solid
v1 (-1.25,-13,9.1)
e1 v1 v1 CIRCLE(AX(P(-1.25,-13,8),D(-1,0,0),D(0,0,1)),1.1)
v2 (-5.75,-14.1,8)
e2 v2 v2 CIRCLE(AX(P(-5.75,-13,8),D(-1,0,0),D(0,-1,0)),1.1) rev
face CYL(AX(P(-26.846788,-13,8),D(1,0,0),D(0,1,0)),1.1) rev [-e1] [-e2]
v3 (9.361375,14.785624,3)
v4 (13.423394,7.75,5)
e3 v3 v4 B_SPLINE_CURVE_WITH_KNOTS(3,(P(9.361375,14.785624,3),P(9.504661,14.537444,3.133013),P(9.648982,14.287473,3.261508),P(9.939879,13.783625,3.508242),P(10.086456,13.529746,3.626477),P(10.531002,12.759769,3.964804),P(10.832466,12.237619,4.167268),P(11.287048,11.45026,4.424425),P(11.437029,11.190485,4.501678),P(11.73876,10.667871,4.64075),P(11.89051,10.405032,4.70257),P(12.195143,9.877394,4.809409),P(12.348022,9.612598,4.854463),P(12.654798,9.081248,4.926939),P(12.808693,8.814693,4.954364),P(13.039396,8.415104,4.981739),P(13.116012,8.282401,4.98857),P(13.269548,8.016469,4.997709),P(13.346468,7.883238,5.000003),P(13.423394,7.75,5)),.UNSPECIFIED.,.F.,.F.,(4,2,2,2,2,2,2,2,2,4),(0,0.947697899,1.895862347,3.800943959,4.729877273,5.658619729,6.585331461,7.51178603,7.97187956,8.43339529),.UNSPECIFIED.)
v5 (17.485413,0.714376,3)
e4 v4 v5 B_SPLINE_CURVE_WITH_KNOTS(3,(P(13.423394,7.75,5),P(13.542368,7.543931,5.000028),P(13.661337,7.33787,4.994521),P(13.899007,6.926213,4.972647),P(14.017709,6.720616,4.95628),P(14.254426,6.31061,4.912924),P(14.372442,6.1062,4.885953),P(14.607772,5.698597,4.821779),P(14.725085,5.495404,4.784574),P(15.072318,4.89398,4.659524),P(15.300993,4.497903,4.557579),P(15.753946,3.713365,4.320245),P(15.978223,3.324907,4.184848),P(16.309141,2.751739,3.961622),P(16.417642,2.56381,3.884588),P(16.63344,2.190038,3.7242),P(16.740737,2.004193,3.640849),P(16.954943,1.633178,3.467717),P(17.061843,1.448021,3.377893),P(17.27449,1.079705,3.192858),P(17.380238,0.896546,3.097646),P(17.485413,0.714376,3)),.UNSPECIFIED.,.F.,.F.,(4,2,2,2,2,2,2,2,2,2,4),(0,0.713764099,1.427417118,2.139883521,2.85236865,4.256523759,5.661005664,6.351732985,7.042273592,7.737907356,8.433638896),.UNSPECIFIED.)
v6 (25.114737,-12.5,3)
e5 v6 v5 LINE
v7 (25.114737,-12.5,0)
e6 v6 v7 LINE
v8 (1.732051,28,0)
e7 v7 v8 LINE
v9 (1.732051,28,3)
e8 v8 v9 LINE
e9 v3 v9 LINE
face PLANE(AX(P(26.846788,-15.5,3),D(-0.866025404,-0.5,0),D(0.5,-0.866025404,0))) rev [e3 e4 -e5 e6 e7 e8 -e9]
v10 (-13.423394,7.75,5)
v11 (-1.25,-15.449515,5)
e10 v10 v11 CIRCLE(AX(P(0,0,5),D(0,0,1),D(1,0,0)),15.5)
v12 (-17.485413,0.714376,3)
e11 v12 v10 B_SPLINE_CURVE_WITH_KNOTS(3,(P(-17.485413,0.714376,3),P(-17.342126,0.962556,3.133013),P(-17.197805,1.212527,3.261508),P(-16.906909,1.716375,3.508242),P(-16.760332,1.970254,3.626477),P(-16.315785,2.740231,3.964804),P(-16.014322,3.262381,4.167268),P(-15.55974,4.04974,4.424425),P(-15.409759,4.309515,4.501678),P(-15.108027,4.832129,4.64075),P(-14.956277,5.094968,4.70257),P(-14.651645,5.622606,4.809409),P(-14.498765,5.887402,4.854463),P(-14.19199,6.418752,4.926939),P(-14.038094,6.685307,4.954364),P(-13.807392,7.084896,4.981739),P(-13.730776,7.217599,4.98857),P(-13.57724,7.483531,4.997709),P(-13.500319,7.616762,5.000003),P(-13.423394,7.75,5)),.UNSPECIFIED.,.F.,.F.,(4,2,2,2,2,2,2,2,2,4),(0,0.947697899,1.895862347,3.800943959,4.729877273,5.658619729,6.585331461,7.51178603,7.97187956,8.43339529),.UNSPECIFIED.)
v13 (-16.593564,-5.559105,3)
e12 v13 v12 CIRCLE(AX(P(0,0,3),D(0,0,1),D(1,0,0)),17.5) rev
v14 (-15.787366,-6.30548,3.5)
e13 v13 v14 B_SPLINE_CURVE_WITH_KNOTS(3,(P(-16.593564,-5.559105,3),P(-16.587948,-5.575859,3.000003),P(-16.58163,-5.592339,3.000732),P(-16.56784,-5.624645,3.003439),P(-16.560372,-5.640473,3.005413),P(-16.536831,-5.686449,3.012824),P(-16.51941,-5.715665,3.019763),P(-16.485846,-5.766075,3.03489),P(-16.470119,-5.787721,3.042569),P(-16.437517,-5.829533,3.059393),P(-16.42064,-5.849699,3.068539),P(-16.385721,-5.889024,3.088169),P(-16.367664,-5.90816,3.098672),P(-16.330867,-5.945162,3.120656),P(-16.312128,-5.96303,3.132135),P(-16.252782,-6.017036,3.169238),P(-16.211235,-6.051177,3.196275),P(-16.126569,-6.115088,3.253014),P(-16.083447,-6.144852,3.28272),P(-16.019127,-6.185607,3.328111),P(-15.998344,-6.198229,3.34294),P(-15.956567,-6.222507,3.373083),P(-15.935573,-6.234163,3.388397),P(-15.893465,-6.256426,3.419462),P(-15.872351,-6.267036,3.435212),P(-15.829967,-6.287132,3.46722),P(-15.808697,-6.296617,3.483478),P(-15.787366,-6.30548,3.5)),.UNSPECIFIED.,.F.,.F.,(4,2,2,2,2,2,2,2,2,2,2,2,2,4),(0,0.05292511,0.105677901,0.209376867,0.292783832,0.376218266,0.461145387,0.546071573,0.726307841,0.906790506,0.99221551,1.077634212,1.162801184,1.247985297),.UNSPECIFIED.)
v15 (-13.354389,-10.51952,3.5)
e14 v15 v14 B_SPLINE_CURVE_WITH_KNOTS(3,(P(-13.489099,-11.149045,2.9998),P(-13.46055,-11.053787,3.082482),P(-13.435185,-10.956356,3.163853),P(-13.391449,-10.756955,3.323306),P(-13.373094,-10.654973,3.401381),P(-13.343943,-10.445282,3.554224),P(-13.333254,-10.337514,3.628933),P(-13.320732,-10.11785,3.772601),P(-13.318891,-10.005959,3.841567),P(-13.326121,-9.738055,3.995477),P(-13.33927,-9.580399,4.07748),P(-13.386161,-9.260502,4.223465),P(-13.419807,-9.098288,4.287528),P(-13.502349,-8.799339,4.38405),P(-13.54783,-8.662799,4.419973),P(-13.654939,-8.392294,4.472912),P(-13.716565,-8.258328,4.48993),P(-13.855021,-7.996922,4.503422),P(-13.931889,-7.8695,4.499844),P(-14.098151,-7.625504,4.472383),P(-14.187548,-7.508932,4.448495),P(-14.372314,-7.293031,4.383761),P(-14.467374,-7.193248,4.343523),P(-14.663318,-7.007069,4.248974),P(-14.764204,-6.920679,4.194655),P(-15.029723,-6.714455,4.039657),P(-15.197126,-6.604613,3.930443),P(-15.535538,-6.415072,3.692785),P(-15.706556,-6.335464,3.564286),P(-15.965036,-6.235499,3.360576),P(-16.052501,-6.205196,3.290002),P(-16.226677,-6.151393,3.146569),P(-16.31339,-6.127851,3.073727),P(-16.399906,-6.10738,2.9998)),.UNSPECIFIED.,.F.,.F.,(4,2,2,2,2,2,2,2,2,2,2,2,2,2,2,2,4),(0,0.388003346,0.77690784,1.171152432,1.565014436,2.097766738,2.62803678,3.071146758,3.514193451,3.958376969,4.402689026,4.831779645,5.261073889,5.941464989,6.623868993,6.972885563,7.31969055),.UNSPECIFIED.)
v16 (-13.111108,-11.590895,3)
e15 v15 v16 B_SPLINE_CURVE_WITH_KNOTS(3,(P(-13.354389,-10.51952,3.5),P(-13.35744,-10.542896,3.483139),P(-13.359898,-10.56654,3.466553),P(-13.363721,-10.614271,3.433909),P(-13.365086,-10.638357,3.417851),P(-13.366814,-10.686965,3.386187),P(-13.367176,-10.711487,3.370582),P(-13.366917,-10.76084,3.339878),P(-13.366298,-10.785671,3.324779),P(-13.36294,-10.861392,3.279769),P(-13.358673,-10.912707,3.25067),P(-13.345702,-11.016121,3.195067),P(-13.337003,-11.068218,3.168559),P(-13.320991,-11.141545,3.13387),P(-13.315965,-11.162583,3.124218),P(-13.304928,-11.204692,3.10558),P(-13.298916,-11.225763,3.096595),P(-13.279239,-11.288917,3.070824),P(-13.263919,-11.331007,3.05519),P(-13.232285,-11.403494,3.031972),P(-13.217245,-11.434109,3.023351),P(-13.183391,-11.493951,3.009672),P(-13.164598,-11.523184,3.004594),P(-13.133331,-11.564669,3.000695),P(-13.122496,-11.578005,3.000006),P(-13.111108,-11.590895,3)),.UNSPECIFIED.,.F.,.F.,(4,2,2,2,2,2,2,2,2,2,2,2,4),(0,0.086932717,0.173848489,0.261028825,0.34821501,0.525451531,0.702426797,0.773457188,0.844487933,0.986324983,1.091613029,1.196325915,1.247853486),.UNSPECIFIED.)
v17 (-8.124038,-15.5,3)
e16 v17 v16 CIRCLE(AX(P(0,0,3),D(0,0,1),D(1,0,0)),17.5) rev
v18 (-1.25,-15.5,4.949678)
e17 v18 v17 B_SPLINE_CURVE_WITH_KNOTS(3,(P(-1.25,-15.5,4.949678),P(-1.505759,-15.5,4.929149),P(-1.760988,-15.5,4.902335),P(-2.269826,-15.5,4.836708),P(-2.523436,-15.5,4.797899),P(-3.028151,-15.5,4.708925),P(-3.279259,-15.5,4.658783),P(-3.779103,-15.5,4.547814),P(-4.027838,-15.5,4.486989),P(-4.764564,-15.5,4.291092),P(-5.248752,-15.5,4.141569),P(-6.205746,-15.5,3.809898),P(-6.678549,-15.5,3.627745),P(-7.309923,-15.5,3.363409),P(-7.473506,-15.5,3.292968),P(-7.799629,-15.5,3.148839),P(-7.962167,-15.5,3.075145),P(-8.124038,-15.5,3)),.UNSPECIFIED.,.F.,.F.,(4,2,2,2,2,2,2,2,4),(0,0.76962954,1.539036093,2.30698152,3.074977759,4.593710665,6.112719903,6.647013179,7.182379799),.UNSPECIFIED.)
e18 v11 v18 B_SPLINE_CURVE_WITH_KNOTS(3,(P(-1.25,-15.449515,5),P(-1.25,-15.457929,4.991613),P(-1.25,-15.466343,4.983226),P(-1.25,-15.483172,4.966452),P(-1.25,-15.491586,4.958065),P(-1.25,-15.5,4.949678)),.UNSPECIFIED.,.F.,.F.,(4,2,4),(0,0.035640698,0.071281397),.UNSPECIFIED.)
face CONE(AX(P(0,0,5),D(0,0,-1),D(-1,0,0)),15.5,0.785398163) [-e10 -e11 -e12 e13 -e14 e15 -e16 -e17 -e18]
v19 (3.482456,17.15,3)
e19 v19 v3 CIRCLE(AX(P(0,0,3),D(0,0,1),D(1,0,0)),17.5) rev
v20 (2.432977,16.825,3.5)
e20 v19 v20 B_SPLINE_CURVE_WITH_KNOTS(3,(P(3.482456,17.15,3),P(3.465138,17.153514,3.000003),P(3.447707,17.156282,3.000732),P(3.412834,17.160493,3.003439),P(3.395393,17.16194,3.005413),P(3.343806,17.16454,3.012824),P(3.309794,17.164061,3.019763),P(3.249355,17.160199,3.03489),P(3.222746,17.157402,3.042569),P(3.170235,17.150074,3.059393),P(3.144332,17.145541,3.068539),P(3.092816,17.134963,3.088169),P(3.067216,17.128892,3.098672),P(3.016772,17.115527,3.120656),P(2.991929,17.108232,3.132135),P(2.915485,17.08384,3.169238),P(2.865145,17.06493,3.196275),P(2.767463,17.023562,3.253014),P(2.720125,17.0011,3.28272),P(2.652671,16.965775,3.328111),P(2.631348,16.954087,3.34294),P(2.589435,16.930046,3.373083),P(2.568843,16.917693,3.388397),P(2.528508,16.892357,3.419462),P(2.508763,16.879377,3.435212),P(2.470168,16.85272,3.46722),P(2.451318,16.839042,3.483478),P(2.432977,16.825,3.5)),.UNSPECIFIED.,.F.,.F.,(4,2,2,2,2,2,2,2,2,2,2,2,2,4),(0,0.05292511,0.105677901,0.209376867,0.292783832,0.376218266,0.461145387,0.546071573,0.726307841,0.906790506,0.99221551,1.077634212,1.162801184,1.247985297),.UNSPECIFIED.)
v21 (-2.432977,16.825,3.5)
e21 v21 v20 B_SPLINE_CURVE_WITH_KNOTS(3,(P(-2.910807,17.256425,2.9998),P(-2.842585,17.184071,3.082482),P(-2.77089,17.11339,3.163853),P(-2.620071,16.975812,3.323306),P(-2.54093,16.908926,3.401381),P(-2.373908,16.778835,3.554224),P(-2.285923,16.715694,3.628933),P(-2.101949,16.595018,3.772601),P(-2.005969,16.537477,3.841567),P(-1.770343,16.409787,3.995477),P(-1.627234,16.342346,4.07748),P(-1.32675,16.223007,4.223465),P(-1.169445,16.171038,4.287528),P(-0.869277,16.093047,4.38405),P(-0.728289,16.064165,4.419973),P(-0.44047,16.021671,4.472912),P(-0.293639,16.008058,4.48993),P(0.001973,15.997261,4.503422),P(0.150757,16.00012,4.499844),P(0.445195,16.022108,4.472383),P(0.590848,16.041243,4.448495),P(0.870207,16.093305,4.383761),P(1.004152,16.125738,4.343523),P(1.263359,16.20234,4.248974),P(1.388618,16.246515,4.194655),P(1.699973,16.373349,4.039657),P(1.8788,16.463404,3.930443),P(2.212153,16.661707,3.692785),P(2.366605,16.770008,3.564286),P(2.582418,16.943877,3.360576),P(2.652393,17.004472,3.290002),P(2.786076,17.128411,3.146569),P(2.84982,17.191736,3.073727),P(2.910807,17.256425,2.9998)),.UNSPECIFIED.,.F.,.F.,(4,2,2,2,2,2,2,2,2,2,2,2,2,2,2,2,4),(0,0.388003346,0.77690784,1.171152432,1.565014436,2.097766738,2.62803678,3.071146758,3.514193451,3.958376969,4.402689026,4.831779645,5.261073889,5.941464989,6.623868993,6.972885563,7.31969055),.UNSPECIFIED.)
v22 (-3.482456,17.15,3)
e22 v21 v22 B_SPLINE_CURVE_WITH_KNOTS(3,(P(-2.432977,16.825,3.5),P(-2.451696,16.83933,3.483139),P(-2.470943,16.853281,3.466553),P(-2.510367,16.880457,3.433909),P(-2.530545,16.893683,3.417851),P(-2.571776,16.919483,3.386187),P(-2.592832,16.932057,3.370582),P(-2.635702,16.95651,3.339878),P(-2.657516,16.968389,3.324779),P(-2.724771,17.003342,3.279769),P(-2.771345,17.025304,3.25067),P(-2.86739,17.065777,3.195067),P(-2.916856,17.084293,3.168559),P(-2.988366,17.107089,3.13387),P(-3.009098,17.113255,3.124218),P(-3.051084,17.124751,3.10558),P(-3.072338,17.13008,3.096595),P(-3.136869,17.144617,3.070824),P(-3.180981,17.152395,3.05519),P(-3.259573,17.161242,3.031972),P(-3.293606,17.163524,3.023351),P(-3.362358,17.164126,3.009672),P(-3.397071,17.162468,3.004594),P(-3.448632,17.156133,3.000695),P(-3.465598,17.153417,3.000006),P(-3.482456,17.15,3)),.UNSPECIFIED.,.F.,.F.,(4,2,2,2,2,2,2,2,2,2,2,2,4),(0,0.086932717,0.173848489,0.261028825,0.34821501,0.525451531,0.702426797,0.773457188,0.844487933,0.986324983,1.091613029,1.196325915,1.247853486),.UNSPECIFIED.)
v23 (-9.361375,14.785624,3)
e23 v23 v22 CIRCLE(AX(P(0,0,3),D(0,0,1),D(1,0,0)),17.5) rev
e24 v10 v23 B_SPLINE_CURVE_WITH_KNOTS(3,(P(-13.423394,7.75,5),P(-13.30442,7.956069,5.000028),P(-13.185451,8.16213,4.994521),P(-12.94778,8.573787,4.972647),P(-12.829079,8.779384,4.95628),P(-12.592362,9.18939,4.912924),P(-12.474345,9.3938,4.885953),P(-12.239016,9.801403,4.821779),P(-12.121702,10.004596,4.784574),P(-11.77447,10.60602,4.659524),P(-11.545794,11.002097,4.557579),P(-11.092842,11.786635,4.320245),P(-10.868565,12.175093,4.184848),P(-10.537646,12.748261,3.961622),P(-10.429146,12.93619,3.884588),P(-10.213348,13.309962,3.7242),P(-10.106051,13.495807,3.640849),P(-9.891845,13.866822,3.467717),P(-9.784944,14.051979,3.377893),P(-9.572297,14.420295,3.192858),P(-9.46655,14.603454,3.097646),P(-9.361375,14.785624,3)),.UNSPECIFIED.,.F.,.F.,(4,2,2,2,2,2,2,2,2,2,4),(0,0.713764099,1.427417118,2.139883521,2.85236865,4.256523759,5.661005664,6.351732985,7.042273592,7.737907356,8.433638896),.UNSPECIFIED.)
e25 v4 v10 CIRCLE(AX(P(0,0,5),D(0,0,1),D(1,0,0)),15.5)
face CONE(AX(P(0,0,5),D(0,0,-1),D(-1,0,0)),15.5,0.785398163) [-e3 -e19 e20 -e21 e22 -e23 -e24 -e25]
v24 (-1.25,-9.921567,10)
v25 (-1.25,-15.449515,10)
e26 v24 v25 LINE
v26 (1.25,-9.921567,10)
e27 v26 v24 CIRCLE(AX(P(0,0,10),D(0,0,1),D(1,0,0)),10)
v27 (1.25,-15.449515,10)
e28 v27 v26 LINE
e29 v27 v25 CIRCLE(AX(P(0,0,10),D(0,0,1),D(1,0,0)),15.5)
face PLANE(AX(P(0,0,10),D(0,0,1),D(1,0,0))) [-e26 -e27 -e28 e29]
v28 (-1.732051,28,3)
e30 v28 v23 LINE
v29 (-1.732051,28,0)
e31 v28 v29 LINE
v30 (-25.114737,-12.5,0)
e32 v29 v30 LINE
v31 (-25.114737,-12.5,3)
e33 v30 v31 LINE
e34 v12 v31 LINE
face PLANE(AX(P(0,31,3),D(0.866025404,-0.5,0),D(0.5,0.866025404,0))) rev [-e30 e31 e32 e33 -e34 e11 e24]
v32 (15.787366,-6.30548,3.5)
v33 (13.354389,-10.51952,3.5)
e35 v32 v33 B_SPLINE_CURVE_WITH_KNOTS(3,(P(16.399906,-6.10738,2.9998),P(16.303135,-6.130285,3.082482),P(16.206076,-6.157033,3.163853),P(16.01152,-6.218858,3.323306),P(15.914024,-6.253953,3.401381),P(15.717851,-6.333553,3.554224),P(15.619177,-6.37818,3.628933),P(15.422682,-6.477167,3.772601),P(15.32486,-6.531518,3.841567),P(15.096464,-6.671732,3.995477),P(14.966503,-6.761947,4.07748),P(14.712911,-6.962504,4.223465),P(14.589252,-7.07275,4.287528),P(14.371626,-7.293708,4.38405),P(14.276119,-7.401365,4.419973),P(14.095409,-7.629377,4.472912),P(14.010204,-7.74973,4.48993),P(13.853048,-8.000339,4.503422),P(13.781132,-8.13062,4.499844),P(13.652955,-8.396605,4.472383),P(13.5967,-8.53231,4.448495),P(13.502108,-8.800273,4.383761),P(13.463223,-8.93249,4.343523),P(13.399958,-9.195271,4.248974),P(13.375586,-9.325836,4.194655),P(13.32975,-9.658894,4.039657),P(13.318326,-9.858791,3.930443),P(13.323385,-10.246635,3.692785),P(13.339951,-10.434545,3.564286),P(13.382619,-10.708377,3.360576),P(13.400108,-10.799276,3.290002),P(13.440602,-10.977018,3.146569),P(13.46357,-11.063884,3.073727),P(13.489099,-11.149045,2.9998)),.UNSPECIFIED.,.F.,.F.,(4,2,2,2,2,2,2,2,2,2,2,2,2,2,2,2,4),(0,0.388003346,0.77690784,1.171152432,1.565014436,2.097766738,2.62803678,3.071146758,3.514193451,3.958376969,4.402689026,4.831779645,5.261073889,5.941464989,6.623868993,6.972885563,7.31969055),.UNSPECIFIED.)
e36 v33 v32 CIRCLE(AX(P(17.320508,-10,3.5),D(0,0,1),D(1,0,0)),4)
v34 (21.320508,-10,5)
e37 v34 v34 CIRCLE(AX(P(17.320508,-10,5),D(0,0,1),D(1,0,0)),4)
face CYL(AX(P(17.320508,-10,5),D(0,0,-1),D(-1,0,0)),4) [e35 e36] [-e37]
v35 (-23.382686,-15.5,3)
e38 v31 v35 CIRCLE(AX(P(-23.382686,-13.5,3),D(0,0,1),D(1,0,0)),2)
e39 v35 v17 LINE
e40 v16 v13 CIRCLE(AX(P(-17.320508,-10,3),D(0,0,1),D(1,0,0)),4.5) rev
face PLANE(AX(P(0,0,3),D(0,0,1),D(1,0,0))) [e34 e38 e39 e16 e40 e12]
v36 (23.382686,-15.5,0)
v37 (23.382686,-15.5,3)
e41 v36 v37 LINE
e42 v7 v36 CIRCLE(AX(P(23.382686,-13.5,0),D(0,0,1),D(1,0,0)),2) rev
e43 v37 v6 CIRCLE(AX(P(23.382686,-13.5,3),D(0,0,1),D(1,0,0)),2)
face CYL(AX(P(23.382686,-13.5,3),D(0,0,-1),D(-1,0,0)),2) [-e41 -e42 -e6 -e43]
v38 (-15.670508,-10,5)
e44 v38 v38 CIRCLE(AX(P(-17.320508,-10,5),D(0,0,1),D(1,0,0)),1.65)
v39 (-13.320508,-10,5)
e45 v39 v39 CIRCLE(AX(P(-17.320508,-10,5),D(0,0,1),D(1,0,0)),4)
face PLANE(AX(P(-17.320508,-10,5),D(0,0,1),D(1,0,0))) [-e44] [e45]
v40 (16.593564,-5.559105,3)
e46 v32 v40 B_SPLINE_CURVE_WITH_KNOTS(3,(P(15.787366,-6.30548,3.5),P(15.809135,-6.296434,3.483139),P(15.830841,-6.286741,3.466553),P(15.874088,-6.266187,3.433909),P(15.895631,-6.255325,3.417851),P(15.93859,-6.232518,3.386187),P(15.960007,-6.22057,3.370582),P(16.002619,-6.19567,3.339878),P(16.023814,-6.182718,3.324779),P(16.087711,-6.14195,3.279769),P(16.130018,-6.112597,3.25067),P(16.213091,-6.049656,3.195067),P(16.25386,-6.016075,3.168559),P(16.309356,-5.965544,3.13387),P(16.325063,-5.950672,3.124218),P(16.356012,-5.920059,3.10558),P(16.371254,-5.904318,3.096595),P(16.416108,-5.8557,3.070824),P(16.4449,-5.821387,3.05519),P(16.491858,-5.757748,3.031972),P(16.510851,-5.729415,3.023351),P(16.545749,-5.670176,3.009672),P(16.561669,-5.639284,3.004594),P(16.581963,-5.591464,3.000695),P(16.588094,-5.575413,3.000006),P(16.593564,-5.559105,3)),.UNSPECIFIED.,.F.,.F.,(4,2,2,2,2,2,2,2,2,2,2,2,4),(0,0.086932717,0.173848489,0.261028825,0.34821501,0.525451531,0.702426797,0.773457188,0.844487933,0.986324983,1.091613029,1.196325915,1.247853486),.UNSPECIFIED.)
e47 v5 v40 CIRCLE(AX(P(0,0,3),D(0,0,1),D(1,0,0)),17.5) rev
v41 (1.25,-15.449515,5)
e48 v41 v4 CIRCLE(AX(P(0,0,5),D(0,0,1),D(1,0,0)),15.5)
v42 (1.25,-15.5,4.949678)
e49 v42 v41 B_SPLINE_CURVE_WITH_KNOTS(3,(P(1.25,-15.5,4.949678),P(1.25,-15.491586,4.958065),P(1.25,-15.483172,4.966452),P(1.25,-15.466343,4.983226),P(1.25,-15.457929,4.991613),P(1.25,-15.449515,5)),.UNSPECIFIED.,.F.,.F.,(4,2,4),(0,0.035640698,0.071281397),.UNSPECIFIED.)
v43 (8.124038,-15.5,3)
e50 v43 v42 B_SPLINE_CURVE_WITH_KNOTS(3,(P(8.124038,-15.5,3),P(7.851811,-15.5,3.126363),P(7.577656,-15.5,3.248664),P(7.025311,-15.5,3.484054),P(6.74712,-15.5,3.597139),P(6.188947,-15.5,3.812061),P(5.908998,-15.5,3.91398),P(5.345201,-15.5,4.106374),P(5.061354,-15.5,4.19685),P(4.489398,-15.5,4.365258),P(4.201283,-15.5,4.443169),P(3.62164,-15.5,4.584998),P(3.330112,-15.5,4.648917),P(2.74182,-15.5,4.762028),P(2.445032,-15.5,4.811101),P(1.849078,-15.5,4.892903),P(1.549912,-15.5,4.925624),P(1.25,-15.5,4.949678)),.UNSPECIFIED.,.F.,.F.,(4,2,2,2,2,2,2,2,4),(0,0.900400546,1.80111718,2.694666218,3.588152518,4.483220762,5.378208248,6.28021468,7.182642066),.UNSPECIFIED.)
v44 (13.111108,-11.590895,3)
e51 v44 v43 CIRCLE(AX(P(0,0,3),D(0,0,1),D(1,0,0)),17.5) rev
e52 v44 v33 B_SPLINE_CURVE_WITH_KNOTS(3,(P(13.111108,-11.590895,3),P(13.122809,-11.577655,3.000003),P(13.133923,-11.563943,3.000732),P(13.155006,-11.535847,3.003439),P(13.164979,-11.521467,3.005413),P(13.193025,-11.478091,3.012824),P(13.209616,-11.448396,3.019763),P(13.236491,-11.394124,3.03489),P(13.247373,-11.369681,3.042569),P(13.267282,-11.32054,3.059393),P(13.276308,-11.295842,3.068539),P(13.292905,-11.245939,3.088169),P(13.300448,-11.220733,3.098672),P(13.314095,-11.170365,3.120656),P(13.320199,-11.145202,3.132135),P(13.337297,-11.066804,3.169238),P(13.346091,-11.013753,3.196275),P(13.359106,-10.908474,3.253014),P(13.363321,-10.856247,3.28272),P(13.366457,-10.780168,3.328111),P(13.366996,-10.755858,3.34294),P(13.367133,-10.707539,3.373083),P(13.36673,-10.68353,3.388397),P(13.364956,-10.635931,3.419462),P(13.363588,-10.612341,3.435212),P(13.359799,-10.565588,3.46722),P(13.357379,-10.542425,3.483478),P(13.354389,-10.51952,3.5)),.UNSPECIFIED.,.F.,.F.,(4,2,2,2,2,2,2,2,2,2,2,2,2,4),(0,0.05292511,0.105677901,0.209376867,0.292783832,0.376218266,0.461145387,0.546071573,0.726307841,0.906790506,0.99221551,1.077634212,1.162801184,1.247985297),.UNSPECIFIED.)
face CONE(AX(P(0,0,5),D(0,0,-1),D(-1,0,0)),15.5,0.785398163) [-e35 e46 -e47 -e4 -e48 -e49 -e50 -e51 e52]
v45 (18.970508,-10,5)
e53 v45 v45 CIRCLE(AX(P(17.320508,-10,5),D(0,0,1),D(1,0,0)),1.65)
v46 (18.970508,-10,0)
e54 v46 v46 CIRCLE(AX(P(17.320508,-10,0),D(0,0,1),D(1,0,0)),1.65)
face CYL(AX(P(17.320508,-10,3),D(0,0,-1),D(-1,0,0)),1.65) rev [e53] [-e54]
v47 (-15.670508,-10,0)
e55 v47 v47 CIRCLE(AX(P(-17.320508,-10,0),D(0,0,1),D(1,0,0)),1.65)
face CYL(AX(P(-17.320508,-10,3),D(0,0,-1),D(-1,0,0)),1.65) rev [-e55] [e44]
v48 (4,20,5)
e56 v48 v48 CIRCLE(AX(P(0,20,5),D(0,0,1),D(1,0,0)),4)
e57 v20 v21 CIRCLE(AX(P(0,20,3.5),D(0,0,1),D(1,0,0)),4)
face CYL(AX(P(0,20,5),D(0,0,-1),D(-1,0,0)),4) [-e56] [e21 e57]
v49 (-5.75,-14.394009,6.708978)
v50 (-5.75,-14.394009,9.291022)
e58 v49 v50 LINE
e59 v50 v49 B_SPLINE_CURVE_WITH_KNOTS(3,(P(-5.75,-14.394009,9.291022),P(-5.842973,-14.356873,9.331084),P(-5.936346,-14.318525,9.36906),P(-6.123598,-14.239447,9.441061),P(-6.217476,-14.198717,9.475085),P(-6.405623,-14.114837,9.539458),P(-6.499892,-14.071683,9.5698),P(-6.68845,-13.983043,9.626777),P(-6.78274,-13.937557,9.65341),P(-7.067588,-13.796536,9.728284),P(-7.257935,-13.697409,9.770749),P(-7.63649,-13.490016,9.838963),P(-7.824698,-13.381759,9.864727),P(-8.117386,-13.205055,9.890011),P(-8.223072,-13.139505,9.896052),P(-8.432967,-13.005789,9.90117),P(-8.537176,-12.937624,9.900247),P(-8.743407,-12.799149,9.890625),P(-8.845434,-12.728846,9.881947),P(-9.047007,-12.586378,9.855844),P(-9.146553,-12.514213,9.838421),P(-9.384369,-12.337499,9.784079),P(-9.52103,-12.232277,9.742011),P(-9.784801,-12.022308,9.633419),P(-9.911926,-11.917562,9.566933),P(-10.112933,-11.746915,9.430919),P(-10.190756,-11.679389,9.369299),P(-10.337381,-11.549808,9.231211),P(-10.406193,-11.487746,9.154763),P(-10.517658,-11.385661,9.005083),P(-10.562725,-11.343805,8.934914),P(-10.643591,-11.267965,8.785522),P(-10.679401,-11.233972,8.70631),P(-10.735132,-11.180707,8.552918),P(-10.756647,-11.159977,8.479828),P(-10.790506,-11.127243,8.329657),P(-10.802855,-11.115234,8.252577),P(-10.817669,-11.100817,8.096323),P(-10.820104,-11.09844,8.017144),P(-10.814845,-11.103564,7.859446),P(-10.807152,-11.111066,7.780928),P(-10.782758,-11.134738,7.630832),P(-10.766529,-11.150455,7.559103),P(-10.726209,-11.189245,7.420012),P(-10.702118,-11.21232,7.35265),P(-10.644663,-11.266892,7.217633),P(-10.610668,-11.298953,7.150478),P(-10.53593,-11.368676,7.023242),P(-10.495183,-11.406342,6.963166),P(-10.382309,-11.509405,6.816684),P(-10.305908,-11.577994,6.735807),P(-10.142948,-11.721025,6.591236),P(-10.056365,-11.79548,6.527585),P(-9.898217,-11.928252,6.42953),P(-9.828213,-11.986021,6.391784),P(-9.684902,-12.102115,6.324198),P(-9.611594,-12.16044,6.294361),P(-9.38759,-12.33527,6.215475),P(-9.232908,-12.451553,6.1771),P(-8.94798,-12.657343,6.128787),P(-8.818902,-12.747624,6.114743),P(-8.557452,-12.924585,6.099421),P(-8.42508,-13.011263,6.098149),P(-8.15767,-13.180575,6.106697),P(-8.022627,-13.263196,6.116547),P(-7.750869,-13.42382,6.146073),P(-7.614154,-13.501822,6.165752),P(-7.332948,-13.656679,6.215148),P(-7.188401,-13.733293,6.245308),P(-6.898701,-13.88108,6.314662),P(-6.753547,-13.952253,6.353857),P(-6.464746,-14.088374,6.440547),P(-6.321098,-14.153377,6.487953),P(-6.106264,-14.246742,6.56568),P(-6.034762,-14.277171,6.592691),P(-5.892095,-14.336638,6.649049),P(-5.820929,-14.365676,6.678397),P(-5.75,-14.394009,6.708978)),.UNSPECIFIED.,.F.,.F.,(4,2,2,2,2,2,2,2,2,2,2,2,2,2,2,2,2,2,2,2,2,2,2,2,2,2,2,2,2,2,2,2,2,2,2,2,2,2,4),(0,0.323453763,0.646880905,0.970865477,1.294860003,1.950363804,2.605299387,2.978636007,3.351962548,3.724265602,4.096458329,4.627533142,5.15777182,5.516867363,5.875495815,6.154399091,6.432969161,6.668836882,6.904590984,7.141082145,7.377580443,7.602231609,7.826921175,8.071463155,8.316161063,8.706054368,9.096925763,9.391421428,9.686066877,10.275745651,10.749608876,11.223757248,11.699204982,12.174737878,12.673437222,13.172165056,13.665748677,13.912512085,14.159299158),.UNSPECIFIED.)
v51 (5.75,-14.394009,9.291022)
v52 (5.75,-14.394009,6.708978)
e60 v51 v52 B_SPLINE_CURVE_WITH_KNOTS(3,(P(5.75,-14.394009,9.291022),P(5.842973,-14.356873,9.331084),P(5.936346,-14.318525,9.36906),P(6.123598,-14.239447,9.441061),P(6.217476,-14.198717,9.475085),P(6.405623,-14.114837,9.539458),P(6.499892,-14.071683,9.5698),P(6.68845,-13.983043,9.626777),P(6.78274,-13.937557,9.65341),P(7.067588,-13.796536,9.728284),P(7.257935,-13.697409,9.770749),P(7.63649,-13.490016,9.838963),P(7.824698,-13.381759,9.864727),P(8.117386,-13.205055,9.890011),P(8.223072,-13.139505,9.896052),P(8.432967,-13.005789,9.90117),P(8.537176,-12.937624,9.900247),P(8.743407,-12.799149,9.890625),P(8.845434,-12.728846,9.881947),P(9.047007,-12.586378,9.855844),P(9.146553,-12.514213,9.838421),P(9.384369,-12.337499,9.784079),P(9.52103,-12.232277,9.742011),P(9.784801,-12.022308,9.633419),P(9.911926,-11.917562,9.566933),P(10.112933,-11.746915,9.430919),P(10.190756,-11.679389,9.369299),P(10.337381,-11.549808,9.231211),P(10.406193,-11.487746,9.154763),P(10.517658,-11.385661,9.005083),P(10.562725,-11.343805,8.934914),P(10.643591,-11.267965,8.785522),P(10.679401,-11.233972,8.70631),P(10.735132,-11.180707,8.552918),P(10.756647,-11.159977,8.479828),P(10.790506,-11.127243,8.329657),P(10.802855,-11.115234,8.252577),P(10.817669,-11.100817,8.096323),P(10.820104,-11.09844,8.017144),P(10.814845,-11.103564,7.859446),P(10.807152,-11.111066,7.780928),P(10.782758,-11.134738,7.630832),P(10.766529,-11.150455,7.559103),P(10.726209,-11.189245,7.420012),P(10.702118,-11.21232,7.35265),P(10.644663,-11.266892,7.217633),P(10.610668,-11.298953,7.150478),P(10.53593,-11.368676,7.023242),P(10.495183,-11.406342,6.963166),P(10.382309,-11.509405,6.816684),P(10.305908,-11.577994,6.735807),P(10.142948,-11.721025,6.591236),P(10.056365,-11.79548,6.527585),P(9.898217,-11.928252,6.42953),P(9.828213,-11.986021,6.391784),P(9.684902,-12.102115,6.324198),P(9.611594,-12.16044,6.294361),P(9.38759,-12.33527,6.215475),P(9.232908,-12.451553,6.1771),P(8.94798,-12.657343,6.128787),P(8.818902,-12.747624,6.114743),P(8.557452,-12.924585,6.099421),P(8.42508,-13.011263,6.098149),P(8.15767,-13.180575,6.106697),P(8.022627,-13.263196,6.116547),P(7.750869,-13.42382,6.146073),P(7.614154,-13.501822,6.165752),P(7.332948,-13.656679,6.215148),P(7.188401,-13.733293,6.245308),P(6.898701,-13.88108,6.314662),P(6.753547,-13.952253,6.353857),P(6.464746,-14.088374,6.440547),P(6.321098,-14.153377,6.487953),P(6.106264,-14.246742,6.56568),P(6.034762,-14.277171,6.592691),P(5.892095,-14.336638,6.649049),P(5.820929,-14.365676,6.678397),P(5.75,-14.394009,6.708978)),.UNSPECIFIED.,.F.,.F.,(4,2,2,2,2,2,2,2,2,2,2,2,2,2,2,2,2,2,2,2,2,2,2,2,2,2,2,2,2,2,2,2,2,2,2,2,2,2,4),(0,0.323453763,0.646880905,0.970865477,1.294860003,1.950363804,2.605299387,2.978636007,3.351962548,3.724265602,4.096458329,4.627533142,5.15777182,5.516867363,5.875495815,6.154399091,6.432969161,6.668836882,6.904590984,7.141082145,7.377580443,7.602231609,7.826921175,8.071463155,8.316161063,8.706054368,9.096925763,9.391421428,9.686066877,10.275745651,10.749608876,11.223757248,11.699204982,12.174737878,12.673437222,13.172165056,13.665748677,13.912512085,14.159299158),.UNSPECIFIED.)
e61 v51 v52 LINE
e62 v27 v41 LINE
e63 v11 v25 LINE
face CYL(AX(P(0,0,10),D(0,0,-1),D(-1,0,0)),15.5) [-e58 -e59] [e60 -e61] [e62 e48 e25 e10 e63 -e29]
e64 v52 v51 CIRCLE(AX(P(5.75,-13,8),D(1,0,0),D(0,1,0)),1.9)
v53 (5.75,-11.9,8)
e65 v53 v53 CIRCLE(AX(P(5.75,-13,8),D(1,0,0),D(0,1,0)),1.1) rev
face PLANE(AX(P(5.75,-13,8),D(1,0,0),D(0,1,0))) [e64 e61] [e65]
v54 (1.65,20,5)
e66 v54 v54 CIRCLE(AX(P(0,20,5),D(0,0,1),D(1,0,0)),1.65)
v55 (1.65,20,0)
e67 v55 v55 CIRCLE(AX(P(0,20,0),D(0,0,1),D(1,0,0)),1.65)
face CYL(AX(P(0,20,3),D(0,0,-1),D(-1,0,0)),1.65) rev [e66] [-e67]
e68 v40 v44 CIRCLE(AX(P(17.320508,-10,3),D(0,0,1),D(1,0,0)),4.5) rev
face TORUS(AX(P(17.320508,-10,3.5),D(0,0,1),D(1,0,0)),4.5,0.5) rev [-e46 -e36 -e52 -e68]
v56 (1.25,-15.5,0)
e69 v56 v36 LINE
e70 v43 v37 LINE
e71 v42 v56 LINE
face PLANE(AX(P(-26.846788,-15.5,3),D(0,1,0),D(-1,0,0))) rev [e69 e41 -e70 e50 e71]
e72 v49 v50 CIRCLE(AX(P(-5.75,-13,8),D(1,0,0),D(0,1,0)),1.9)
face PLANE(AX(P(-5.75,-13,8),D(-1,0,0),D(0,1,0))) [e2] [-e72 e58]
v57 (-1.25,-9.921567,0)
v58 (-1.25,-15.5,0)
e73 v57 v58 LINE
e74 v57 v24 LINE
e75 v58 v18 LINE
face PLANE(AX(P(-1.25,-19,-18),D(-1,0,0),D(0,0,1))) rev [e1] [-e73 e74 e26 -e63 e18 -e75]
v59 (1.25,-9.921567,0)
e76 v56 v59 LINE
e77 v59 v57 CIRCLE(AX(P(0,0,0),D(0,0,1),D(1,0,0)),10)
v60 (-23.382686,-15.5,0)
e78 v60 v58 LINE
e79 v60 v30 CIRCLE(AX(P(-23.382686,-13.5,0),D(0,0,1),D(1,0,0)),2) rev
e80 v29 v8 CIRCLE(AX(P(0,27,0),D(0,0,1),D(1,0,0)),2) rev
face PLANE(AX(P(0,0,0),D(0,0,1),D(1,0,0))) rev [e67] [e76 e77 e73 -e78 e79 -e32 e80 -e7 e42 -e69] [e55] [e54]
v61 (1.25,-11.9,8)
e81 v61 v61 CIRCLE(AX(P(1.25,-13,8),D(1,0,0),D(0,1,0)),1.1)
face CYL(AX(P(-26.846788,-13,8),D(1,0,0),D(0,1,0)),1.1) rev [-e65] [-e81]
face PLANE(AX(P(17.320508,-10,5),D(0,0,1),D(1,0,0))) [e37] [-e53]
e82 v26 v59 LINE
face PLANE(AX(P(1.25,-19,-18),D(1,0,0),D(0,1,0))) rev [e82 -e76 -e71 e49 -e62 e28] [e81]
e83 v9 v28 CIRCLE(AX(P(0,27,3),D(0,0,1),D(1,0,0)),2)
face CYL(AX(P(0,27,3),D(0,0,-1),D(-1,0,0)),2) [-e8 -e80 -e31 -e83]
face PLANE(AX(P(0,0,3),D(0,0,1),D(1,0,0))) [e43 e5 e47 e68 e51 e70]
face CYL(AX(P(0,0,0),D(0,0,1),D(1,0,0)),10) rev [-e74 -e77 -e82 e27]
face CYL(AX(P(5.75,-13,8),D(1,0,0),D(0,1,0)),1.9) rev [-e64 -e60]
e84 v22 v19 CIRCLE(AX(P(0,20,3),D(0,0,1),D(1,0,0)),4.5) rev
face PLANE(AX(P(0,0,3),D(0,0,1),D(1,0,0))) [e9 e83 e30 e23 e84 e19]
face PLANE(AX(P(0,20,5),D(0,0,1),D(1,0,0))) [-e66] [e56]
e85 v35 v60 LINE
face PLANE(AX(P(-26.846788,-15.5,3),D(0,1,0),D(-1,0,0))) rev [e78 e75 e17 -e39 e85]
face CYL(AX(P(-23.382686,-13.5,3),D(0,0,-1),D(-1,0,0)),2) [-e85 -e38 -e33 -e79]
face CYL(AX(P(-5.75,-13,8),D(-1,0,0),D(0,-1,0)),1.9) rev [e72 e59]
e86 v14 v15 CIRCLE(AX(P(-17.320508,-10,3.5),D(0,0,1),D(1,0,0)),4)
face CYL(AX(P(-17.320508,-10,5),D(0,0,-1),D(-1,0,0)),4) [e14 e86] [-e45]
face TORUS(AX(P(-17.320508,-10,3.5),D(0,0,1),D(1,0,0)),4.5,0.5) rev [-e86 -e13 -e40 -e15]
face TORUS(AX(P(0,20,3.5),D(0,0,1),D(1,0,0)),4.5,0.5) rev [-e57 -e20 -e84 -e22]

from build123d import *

# Parameters (mm, degrees)
SKETCH_1_R               = 1.65
SKETCH_1_R_2             = 9
EXTRUDE_1_DEPTH          = 3
SKETCH_2_R               = 15.5
SKETCH_2_R_2             = 9
EXTRUDE_2_DEPTH          = 7
SKETCH_3_W               = 2.5
SKETCH_3_H               = 20
CUT_EXTRUDE_1_DEPTH      = 28
CUT_EXTRUDE_2_DEPTH      = 44.016618519
CUT_EXTRUDE_2_DEPTH_BACK = 44.016618519
SKETCH_4_R               = 1.1
SKETCH_5_R               = 10
CUT_EXTRUDE_3_DEPTH      = 43.210780613
SKETCH_6_R               = 1.9
CUT_EXTRUDE_8_DEPTH      = 13
CHAMFER_1_SIZE           = 2
FILLET_2_R               = 2
SKETCH_7_R               = 4
SKETCH_7_R_2             = 1.65
EXTRUDE_3_DEPTH          = 2
FILLET_3_R               = 0.5


with BuildPart() as part:
    # 草图1 → 凸台-拉伸1 (new body)
    with BuildSketch(Plane.XY):
        Polygon((0, 31), (-26.846787517, -15.5), (26.846787517, -15.5), align=None)
        with Locations((0, 20)):
            Circle(SKETCH_1_R, mode=Mode.SUBTRACT)
        with Locations((17.320508076, -10)):
            Circle(SKETCH_1_R, mode=Mode.SUBTRACT)
        with Locations((-17.320508076, -10)):
            Circle(SKETCH_1_R, mode=Mode.SUBTRACT)
        Circle(SKETCH_1_R_2, mode=Mode.SUBTRACT)
    extrude(amount=EXTRUDE_1_DEPTH)

    # 草图2 → 凸台-拉伸2 (add)
    with BuildSketch(Plane.XY.offset(3)):
        with Locations(Location((0, 0, 0), (0, 0, 150))):
            Circle(SKETCH_2_R)
        Circle(SKETCH_2_R_2, mode=Mode.SUBTRACT)
    extrude(amount=EXTRUDE_2_DEPTH)

    # 草图3 → 切除-拉伸1 (cut)
    with BuildSketch(Plane.XY.offset(10)):
        with Locations((0, -9)):
            Rectangle(SKETCH_3_W, SKETCH_3_H)
    extrude(amount=-CUT_EXTRUDE_1_DEPTH, mode=Mode.SUBTRACT)

    # 草图4 → 切除-拉伸2 (cut, two sides: drawn at the far end of the back side and taken through both)
    with BuildSketch(Plane(origin=(-1.25, 0, 0), x_dir=(0, 0, -1), z_dir=(1, 0, 0)).offset(-CUT_EXTRUDE_2_DEPTH_BACK)):
        with Locations(Location((-8, -13, 0), (0, 0, 90))):
            Circle(SKETCH_4_R)
    extrude(amount=CUT_EXTRUDE_2_DEPTH + CUT_EXTRUDE_2_DEPTH_BACK, mode=Mode.SUBTRACT)

    # 草图5 → 切除-拉伸3 (cut, through all)
    with BuildSketch(Plane.XY.offset(10)):
        Circle(SKETCH_5_R)
    extrude(amount=-CUT_EXTRUDE_3_DEPTH, mode=Mode.SUBTRACT)

    # 草图6 → 切除-拉伸8 (cut)
    with BuildSketch(Plane(origin=(18.75, 0, 0), x_dir=(0, 0, -1), z_dir=(1, 0, 0))):
        with Locations((-8, -13)):
            Circle(SKETCH_6_R)
    cut_extrude_8 = extrude(amount=-CUT_EXTRUDE_8_DEPTH, mode=Mode.SUBTRACT)

    # 镜向1: 切除-拉伸8 across plane
    add(cut_extrude_8.mirror(Plane(origin=(0, 0, 0), x_dir=(0, 0, 1), z_dir=(1, 0, 0))), mode=Mode.SUBTRACT)

    # 倒角1
    # the kernel refuses this chamfer: 2 mm, written as the material it adds along each edge
    with BuildSketch(Plane(origin=(0, 0, 3), x_dir=(-0.24867915141291427, -0.9685859175378057, 0), z_dir=(-0.9685859175378057, 0.24867915141291427, 0))) as chamfer_1_piece_1_section:
        Polygon((15.5 + CHAMFER_1_SIZE, 0), (15.5, CHAMFER_1_SIZE), (15.5, 0), align=None)
    chamfer_1_piece_1 = revolve(axis=Axis((0, 0, 3), (0, 0, 1)), revolution_arc=134.399365049, mode=Mode.PRIVATE)
    chamfer_1_piece_1 = split(chamfer_1_piece_1, bisect_by=Plane(origin=(-1.25, -15.346279834, 3.925823909), z_dir=(-1, 0, 0)), keep=Keep.TOP, mode=Mode.PRIVATE)
    chamfer_1_piece_1 = split(chamfer_1_piece_1, bisect_by=Plane(origin=(-2.983750464, -15.5, 3.925823909), z_dir=(0, 1, 0)), keep=Keep.TOP, mode=Mode.PRIVATE)
    add(chamfer_1_piece_1)
    with BuildSketch(Plane(origin=(0, 0, 3), x_dir=(-0.24867915141291427, -0.9685859175378057, 0), z_dir=(-0.9685859175378057, 0.24867915141291427, 0))) as chamfer_1_piece_2_section:
        Polygon((15.5 + CHAMFER_1_SIZE, 0), (15.5, CHAMFER_1_SIZE), (15.5, 0), align=None)
    chamfer_1_piece_2 = revolve(axis=Axis((0, 0, 3), (0, 0, 1)), revolution_arc=134.399365049, mode=Mode.PRIVATE)
    chamfer_1_piece_2 = split(chamfer_1_piece_2, bisect_by=Plane(origin=(1.25, -7.656401186, 3.97388988), z_dir=(1, 0, 0)), keep=Keep.TOP, mode=Mode.PRIVATE)
    chamfer_1_piece_2 = split(chamfer_1_piece_2, bisect_by=Plane(origin=(14.586588654, -15.5, 3.97388988), z_dir=(0, 1, 0)), keep=Keep.TOP, mode=Mode.PRIVATE)
    chamfer_1_piece_2 = split(chamfer_1_piece_2, bisect_by=Plane(origin=(20.385359887, -4.308479054, 3.97388988), z_dir=(-0.8660254037844387, -0.5000000000000001, 0)), keep=Keep.TOP, mode=Mode.PRIVATE)
    add(chamfer_1_piece_2)
    with BuildSketch(Plane(origin=(0, 0, 3), x_dir=(-0.8660254037844386, 0.4999999999999999, 0), z_dir=(0.4999999999999999, 0.8660254037844386, 0))) as chamfer_1_piece_3_section:
        Polygon((15.5 + CHAMFER_1_SIZE, 0), (15.5, CHAMFER_1_SIZE), (15.5, 0), align=None)
    chamfer_1_piece_3 = revolve(axis=Axis((0, 0, 3), (0, 0, 1)), revolution_arc=134.399364936, mode=Mode.PRIVATE)
    chamfer_1_piece_3 = split(chamfer_1_piece_3, bisect_by=Plane(origin=(-20.385359891, -4.308479063, 3.973889878), z_dir=(0.8660254037844387, -0.5000000000000001, 0)), keep=Keep.TOP, mode=Mode.PRIVATE)
    chamfer_1_piece_3 = split(chamfer_1_piece_3, bisect_by=Plane(origin=(-1.25, -7.656401201, 3.973889878), z_dir=(-1, 0, 0)), keep=Keep.TOP, mode=Mode.PRIVATE)
    chamfer_1_piece_3 = split(chamfer_1_piece_3, bisect_by=Plane(origin=(-14.586588647, -15.5, 3.973889878), z_dir=(0, 1, 0)), keep=Keep.TOP, mode=Mode.PRIVATE)
    add(chamfer_1_piece_3)
    with BuildSketch(Plane(origin=(0, 0, 3), x_dir=(-0.8660254037844386, 0.4999999999999999, 0), z_dir=(0.4999999999999999, 0.8660254037844386, 0))) as chamfer_1_piece_4_section:
        Polygon((15.5 + CHAMFER_1_SIZE, 0), (15.5, CHAMFER_1_SIZE), (15.5, 0), align=None)
    chamfer_1_piece_4 = revolve(axis=Axis((0, 0, 3), (0, 0, 1)), revolution_arc=134.399364936, mode=Mode.PRIVATE)
    chamfer_1_piece_4 = split(chamfer_1_piece_4, bisect_by=Plane(origin=(1.25, -15.346279834, 3.925823908), z_dir=(1, 0, 0)), keep=Keep.TOP, mode=Mode.PRIVATE)
    chamfer_1_piece_4 = split(chamfer_1_piece_4, bisect_by=Plane(origin=(2.983750464, -15.5, 3.925823908), z_dir=(0, 1, 0)), keep=Keep.TOP, mode=Mode.PRIVATE)
    add(chamfer_1_piece_4)
    with BuildSketch(Plane(origin=(0, 0, 3), x_dir=(0.8660254027930385, 0.5000000017171554, 0), z_dir=(0.5000000017171554, -0.8660254027930385, 0))) as chamfer_1_piece_5_section:
        Polygon((15.5, CHAMFER_1_SIZE), (15.5 + CHAMFER_1_SIZE, 0), (15.5, 0), align=None)
    chamfer_1_piece_5 = revolve(axis=Axis((0, 0, 3), (0, 0, 1)), revolution_arc=119.999999886, mode=Mode.PRIVATE)
    chamfer_1_piece_5 = split(chamfer_1_piece_5, bisect_by=Plane(origin=(-6.289993318, 20.105411993, 3.973882667), z_dir=(0.8660254037844387, -0.5000000000000001, 0)), keep=Keep.TOP, mode=Mode.PRIVATE)
    chamfer_1_piece_5 = split(chamfer_1_piece_5, bisect_by=Plane(origin=(6.28999331, 20.105412007, 3.973882667), z_dir=(-0.8660254037844387, -0.5000000000000001, 0)), keep=Keep.TOP, mode=Mode.PRIVATE)
    add(chamfer_1_piece_5)

    # 圆角2
    fillet_2_edges = [part.edges().sort_by_distance(p)[0] for p in [
        (26.846787517, -15.5, 1.5),
        (-26.846787517, -15.5, 1.5),
        (0, 31, 1.5),
    ]]
    fillet(fillet_2_edges, radius=FILLET_2_R)

    # 草图7 → 凸台-拉伸3 (add)
    # profile 1 of 3: a face of its own
    with BuildSketch(Plane.XY.offset(3)):
        with Locations(Location((0, 20, 0), (0, 0, 223.309380883))):
            Circle(SKETCH_7_R)
        with Locations((0, 20)):
            Circle(SKETCH_7_R_2, mode=Mode.SUBTRACT)
    # profile 2 of 3: a face of its own
    with BuildSketch(Plane.XY.offset(3)):
        with Locations(Location((17.320508076, -10, 0), (0, 0, 196.690618915))):
            Circle(SKETCH_7_R)
        with Locations((17.320508076, -10)):
            Circle(SKETCH_7_R_2, mode=Mode.SUBTRACT)
    # profile 3 of 3: a face of its own
    with BuildSketch(Plane.XY.offset(3)):
        with Locations(Location((-17.320508076, -10, 0), (0, 0, 76.690618915))):
            Circle(SKETCH_7_R)
        with Locations((-17.320508076, -10)):
            Circle(SKETCH_7_R_2, mode=Mode.SUBTRACT)
    extrude(amount=EXTRUDE_3_DEPTH)

    # 圆角3
    # the kernel refuses this fillet: 0.5 mm, written as the material it adds along each edge
    with BuildSketch(Plane(origin=(-17.320508076, -10, 3), x_dir=(0.5191846053523372, 0.854662123628477, 0), z_dir=(0.854662123628477, -0.5191846053523372, 0))) as fillet_3_piece_1:
        with BuildLine():
            CenterArc((4 + FILLET_3_R, FILLET_3_R), FILLET_3_R, 180, 90)
            Line((4 + FILLET_3_R, 0), (4, 0))
            Line((4, 0), (4, FILLET_3_R))
        make_face()
    revolve(axis=Axis((-17.320508076, -10, 3), (0, 0, 1)), revolution_arc=302.555144431)
    with BuildSketch(Plane(origin=(17.320508076, -10, 3), x_dir=(-0.9997514133907861, 0.022295995674683326, 0), z_dir=(0.022295995674683326, 0.9997514133907861, 0))) as fillet_3_piece_2:
        with BuildLine():
            CenterArc((4 + FILLET_3_R, FILLET_3_R), FILLET_3_R, 180, 90)
            Line((4, FILLET_3_R), (4, 0))
            Line((4, 0), (4 + FILLET_3_R, 0))
        make_face()
    revolve(axis=Axis((17.320508076, -10, 3), (0, 0, 1)), revolution_arc=302.555144431)
    with BuildSketch(Plane(origin=(0, 20, 3), x_dir=(0.4805668111313066, -0.8769581176082967, 0), z_dir=(-0.8769581176082967, -0.4805668111313066, 0))) as fillet_3_piece_3:
        with BuildLine():
            CenterArc((4 + FILLET_3_R, FILLET_3_R), FILLET_3_R, 180, 90)
            Line((4 + FILLET_3_R, 0), (4, 0))
            Line((4, 0), (4, FILLET_3_R))
        make_face()
    revolve(axis=Axis((0, 20, 3), (0, 0, 1)), revolution_arc=302.555144229)


solid = part.part
